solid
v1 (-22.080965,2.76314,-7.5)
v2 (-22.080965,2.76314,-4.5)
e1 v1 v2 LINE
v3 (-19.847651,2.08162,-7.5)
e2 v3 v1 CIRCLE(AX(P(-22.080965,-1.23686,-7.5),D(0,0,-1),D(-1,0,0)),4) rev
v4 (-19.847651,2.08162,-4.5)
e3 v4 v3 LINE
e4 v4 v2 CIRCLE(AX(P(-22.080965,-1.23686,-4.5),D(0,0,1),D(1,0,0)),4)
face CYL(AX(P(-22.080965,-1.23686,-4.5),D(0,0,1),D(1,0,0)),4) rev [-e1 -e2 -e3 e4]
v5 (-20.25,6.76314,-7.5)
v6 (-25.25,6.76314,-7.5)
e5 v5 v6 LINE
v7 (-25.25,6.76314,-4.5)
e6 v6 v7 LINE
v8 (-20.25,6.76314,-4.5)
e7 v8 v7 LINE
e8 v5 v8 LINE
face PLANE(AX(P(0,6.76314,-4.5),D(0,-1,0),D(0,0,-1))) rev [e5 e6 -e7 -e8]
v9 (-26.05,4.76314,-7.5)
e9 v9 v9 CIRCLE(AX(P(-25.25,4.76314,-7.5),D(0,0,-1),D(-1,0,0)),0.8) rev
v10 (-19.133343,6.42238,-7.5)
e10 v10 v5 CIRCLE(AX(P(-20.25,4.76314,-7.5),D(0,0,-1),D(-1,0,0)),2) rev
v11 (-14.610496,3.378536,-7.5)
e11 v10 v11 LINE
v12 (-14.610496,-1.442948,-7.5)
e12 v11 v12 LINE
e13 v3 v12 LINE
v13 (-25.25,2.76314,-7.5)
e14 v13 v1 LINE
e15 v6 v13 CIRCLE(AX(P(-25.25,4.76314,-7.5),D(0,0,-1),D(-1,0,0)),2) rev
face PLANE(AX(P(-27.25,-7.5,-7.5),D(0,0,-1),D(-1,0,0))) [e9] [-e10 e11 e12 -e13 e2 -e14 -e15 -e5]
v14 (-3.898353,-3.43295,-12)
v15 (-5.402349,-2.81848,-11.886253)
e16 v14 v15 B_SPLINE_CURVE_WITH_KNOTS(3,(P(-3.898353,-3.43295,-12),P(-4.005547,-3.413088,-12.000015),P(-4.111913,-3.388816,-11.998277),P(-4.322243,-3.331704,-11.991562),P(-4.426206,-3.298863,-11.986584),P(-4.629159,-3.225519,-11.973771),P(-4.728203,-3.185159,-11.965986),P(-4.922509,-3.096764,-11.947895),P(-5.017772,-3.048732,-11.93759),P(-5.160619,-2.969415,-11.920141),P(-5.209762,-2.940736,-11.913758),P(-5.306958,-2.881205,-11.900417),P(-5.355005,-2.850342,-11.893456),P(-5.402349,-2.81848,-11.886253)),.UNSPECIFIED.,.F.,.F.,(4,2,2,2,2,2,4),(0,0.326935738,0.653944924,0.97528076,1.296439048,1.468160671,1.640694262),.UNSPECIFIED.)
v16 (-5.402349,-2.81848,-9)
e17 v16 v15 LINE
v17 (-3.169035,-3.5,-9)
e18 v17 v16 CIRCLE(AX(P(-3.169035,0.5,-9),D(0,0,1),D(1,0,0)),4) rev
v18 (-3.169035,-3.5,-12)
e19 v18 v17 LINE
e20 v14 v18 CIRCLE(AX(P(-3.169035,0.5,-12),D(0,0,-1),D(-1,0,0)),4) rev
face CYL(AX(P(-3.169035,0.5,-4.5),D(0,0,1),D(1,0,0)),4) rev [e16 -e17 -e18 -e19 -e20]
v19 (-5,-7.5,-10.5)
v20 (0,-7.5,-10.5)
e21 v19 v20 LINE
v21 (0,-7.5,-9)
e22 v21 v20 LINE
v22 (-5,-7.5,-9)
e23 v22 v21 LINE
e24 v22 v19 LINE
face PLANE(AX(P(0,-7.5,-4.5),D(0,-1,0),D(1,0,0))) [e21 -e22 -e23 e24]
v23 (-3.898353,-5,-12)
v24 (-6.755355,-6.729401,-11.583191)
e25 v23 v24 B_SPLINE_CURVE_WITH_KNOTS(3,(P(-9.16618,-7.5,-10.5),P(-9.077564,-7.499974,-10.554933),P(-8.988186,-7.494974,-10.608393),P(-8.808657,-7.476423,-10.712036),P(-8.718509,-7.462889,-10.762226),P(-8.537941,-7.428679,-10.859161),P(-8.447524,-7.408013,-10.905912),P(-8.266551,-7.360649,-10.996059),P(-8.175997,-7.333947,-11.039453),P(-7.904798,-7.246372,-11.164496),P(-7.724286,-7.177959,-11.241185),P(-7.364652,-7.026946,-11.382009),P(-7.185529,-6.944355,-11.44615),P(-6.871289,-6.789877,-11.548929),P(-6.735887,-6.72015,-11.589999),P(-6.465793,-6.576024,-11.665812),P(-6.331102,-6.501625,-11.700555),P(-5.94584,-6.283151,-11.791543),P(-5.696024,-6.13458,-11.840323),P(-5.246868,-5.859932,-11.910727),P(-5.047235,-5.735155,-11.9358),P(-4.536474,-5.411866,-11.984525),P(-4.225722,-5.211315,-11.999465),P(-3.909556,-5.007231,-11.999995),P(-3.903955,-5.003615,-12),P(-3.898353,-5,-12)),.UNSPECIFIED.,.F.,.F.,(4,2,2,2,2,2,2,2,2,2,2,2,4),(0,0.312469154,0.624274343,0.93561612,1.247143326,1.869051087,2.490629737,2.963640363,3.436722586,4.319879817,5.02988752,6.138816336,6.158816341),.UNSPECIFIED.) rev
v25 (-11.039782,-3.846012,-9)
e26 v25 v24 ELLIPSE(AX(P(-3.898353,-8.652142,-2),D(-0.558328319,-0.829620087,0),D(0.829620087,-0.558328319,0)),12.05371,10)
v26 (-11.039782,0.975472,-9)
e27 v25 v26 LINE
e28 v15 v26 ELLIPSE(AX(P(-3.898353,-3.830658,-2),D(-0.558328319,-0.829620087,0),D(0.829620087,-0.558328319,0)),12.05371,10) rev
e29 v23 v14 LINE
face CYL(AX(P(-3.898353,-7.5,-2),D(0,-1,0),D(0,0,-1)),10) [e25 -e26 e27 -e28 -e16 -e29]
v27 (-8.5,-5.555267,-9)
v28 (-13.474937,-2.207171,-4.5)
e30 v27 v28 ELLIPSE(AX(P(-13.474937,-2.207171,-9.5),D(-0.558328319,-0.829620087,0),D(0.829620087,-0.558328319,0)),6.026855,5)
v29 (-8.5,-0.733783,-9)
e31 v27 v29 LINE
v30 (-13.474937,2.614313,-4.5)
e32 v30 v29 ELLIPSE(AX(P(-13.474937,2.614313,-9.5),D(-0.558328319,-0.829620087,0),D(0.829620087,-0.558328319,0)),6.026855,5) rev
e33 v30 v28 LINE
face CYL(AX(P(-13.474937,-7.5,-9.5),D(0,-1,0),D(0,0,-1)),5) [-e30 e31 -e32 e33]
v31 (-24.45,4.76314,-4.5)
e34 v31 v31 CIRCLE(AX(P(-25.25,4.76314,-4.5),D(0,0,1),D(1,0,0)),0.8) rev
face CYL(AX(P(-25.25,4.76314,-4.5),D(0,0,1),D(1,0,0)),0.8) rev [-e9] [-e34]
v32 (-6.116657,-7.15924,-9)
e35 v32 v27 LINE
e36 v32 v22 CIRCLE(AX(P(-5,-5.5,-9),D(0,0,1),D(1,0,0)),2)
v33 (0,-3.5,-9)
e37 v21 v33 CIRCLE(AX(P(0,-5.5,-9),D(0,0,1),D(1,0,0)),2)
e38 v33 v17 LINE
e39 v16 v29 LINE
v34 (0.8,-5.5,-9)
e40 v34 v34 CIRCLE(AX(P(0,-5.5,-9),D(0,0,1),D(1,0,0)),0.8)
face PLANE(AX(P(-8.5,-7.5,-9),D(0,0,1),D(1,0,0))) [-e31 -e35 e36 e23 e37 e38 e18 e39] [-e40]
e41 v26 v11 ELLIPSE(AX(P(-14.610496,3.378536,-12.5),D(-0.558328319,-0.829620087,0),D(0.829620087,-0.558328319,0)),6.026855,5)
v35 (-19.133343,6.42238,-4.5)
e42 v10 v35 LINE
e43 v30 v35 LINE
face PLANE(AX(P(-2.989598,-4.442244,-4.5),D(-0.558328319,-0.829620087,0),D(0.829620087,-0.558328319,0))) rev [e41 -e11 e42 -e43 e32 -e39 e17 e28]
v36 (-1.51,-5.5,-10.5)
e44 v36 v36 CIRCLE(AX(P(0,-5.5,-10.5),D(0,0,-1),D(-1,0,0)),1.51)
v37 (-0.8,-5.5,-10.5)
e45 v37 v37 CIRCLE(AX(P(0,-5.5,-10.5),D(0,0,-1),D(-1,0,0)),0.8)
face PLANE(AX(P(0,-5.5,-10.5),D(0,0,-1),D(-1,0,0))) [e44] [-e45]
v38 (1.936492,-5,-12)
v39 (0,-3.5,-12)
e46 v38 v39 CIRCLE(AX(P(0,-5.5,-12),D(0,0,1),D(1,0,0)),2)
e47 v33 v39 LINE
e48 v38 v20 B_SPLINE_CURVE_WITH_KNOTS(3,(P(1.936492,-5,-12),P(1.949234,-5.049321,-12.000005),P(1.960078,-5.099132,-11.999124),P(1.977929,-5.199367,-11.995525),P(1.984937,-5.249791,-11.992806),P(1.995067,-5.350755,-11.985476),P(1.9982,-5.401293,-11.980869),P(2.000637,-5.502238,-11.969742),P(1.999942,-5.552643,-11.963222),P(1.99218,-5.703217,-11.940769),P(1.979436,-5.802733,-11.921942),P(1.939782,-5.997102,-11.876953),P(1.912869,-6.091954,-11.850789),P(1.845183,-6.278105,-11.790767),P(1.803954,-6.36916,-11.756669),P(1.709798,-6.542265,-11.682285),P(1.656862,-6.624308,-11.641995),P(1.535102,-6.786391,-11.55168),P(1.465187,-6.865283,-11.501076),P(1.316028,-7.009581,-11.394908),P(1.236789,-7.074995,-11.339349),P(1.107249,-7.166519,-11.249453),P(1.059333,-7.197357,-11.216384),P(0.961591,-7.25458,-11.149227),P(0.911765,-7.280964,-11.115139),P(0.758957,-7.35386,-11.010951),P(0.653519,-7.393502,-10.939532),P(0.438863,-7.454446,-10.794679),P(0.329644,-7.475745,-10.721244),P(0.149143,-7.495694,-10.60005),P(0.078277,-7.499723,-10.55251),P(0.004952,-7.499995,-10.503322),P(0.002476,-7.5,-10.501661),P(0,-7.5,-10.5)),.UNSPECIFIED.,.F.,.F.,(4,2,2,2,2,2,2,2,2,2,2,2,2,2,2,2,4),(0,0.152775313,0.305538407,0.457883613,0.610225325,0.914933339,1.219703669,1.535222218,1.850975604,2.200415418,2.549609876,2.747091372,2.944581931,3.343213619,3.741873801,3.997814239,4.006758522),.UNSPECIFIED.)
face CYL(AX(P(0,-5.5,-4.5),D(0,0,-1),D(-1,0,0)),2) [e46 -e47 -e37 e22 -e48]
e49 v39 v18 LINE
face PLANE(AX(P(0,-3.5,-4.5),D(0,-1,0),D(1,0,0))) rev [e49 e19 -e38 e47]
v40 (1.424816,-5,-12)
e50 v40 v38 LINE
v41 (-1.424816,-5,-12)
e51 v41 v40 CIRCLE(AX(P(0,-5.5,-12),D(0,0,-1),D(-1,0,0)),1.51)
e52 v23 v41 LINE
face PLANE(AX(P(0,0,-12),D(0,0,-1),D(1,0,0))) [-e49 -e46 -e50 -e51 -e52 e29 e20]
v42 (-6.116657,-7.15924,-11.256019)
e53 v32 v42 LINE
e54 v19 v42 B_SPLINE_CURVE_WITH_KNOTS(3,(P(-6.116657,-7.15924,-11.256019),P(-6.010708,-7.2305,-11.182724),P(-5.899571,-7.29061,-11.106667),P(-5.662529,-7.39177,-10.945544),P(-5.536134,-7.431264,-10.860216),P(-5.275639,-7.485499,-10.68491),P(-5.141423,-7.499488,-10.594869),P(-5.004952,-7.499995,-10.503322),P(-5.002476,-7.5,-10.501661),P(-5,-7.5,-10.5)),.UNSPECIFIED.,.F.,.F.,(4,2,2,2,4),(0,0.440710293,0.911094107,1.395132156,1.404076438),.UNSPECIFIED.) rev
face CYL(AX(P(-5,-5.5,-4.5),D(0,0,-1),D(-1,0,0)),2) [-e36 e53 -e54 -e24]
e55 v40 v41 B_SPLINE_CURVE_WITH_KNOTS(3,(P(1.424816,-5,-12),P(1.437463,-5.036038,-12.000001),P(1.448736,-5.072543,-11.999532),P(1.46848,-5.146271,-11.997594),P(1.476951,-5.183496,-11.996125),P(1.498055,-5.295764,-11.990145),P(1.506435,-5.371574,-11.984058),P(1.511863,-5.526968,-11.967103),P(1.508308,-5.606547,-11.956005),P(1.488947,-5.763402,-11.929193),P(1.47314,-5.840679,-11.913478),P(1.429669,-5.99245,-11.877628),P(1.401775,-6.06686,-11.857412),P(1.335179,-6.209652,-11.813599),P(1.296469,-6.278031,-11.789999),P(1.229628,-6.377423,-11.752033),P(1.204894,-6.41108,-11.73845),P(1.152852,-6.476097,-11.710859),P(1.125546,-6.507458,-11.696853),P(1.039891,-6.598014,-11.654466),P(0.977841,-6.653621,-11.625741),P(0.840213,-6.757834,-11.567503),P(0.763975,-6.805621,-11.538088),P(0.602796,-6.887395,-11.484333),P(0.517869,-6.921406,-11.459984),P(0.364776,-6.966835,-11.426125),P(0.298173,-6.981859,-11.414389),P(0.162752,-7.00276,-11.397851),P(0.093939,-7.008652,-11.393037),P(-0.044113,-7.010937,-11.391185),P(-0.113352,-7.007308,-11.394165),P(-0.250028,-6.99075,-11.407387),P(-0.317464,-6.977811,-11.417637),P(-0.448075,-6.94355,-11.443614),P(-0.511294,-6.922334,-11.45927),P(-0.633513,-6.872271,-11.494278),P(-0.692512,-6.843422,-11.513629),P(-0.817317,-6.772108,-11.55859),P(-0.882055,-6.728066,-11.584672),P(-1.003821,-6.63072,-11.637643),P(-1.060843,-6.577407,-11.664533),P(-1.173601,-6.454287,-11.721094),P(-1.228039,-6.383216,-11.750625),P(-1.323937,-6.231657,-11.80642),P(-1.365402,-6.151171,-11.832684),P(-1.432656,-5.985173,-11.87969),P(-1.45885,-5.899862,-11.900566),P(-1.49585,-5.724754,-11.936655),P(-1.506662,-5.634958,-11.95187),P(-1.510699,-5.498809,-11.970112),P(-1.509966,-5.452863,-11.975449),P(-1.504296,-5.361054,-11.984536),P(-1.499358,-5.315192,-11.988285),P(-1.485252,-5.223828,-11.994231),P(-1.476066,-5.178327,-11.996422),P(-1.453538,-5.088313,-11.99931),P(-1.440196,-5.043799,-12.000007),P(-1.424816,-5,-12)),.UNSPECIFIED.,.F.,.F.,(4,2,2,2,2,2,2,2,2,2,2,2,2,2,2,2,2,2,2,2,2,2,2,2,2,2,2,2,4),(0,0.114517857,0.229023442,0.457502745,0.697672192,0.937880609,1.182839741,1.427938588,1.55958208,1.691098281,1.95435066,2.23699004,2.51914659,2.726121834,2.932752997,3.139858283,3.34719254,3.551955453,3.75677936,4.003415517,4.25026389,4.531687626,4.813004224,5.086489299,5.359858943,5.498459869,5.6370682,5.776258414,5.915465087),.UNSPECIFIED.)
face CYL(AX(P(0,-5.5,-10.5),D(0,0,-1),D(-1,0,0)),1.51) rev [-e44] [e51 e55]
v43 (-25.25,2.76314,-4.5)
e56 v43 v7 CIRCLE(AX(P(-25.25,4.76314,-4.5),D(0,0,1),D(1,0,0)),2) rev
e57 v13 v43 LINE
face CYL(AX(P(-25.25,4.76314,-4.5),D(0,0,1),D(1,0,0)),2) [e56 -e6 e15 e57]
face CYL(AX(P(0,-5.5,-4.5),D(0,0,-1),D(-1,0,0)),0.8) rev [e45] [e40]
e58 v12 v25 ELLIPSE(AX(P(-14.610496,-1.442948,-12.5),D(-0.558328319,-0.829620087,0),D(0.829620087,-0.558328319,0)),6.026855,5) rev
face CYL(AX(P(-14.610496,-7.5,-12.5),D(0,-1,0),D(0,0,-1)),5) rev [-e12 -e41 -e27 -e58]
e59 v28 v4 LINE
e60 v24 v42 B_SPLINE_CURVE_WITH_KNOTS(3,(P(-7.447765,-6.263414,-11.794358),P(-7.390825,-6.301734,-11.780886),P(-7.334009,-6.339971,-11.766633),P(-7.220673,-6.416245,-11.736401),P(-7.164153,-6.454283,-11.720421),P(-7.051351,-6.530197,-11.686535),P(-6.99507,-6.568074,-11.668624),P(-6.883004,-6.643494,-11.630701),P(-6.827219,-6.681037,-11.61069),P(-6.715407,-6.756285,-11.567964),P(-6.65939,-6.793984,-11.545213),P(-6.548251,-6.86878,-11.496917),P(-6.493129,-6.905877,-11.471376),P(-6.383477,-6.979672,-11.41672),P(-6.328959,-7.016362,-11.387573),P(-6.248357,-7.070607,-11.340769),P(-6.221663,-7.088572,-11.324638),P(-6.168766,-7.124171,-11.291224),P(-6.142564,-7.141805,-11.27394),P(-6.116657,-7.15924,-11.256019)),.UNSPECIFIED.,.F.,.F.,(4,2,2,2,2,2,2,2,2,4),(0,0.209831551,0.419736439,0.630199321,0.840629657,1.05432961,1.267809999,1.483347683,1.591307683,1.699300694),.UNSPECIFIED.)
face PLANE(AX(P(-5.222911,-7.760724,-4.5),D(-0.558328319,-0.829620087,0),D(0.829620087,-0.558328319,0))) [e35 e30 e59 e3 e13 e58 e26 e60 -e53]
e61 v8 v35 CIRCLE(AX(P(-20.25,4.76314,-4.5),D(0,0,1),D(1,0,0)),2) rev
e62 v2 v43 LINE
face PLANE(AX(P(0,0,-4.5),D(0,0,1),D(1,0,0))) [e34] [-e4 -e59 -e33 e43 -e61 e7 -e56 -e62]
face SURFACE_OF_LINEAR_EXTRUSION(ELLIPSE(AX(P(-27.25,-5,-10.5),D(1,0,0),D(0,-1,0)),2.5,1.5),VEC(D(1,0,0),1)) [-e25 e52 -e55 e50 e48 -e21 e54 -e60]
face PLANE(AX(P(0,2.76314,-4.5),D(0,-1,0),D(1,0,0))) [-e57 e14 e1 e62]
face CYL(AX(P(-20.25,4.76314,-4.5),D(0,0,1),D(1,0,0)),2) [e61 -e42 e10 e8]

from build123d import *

# Parameters (mm, degrees)
BOSS_EXTRUDE1_START = -4.5
SKETCH1_R           = 0.8
BOSS_EXTRUDE1_DEPTH = 7.5
FILLET1_R           = 4
SKETCH4_W           = 10.5
SKETCH4_H           = 4.5
CUT_EXTRUDE2_DEPTH  = 29.619267985
SKETCH5_W           = 15
SKETCH5_H           = 4.5
CUT_EXTRUDE3_DEPTH  = 29.619267985
FILLET2_R           = 10
FILLET3_R           = 5
FILLET4_R           = 5
SKETCH7_W           = 29.25
SKETCH7_H           = 14.263139721
CUT_EXTRUDE4_DEPTH  = 7.5
CUT_EXTRUDE5_START  = -6.755354819
CUT_EXTRUDE5_DEPTH  = 8.755354819
SKETCH10_R          = 1.51
CUT_EXTRUDE6_DEPTH  = 1.5


# Read off the part's stored shape, not the designer's step: Mirror5, Cut-Extrude5
with BuildPart() as part:
    # Sketch1 → Boss-Extrude1 (new body)
    with BuildSketch(Plane.XY.offset(BOSS_EXTRUDE1_START)):
        with BuildLine():
            Line((-4.389678411, -3.5), (-19.133343362, 6.422379894))
            ThreePointArc((-19.133343362, 6.422379894), (-19.666253628, 6.676053774), (-20.25, 6.763139721))
            Line((-20.25, 6.763139721), (-25.25, 6.763139721))
            ThreePointArc((-25.25, 6.763139721), (-27.246991207, 4.872803379), (-25.468997361, 2.775165839))
            ThreePointArc((-25.468997361, 2.775165839), (-25.359663658, 2.766148514), (-25.25, 2.763139721))
            Line((-25.25, 2.763139721), (-20.860321589, 2.763139721))
            Line((-20.860321589, 2.763139721), (-6.116656638, -7.159240173))
            ThreePointArc((-6.116656638, -7.159240173), (-5.583746372, -7.412914053), (-5, -7.5))
            Line((-5, -7.5), (0, -7.5))
            ThreePointArc((0, -7.5), (1.974370247, -5.81915847), (0.630136986, -3.601862129))
            ThreePointArc((0.630136986, -3.601862129), (0.31915847, -3.525629753), (0, -3.5))
            Line((0, -3.5), (-4.389678411, -3.5))
        make_face()
        with Locations((0, -5.5)):
            Circle(SKETCH1_R, mode=Mode.SUBTRACT)
        with Locations((-25.25, 4.763139721)):
            Circle(SKETCH1_R, mode=Mode.SUBTRACT)
    extrude(amount=BOSS_EXTRUDE1_DEPTH)

    # Fillet1
    fillet1_edges = [part.edges().sort_by_distance(p)[0] for p in [
        (-4.389678411, -3.5, -0.75),
        (-20.860321589, 2.763139721, -0.75),
    ]]
    fillet(fillet1_edges, radius=FILLET1_R)

    # Sketch4 → Cut-Extrude2 (cut, symmetric)
    with BuildSketch(Plane(origin=(0, 0, 0), x_dir=(1, 0, 0), z_dir=(0, 1, 0))):
        with Locations((-3.25, 2.25)):
            Rectangle(SKETCH4_W, SKETCH4_H)
    extrude(amount=CUT_EXTRUDE2_DEPTH, both=True, mode=Mode.SUBTRACT)

    # Sketch5 → Cut-Extrude3 (cut, symmetric)
    with BuildSketch(Plane(origin=(0, 0, 0), x_dir=(1, 0, 0), z_dir=(0, 1, 0))):
        with Locations((-19.75, -0.75)):
            Rectangle(SKETCH5_W, SKETCH5_H)
    extrude(amount=CUT_EXTRUDE3_DEPTH, both=True, mode=Mode.SUBTRACT)

    # Fillet2
    # the kernel refuses this fillet: 10 mm, written as the material it takes off along each edge
    with BuildSketch(Plane(origin=(-12.25, -23.910660804, 3), x_dir=(1.537930276954748e-12, 0, -1.0), z_dir=(0, 1, 0))) as fillet2_piece_1:
        with BuildLine():
            CenterArc((10, -8.351646544), FILLET2_R, 123.367012969, 56.632987031)
            Line((0, -8.351646544), (-0.2, -8.351646544))
            Line((-0.2, -8.351646544), (-0.2, 0))
            Line((-0.2, 0), (0, 0.2))
            ThreePointArc((0, 0.2), (2.25, 0.2), (4.39, 0.167032931))
            Line((4.39, 0.167032931), (4.5, 0))
        make_face()
    extrude(amount=46.579716753, mode=Mode.SUBTRACT)

    # Fillet3
    # the kernel refuses this fillet: 5 mm, written as the material it takes off along each edge
    with BuildSketch(Plane(origin=(-8.5, -17.99261029, -4.5), x_dir=(0, 0, 1), z_dir=(0, 1, 0))) as fillet3_piece_1:
        with BuildLine():
            CenterArc((5, -4.974937186), FILLET3_R, 95.739170477, 84.260829523)
            Line((0, -4.974937186), (-0.1, -4.974937186))
            Line((-0.1, -4.974937186), (-0.1, 0))
            Line((-0.1, 0), (0, 0.1))
            ThreePointArc((0, 0.1), (2.25, 0.1), (4.49, 0.099498744))
            Line((4.49, 0.099498744), (4.5, 0))
        make_face()
    extrude(amount=29.696169959, mode=Mode.SUBTRACT)

    # Fillet4
    fillet4_edges = [part.edges().sort_by_distance(p)[0] for p in [
        (-12.25, -0.620802428, -1.5),
    ]]
    fillet(fillet4_edges, radius=FILLET4_R)

    # Mirror5: part across plane


with BuildPart() as part_1:
    add(part.part)
    add(part.part.mirror(Plane.XY.offset(-4.5)))

    # Sketch7 → Cut-Extrude4 (cut)
    with BuildSketch(Plane.XY.offset(3)):
        with Locations((-12.625, -0.36843014)):
            Rectangle(SKETCH7_W, SKETCH7_H)
    extrude(amount=-CUT_EXTRUDE4_DEPTH, mode=Mode.SUBTRACT)

    # Cut-Extrude5 outline → Cut-Extrude5 (cut)
    with BuildSketch(Plane(origin=(0, 0, 0), x_dir=(0, 0, -1), z_dir=(1, 0, 0)).offset(CUT_EXTRUDE5_START)):
        with BuildLine():
            add(Edge.make_bspline(
                [(10.5, -7.5), (12, -7.5), (12, -5)],
                knots=[0, 0, 0, 1.570796327, 1.570796327, 1.570796327], degree=2, weights=[1, 0.707106781, 1]))
            Line((10.5, -7.5), (12, -7.5))
            Line((12, -7.5), (12, -5))
        make_face()
    extrude(amount=CUT_EXTRUDE5_DEPTH, mode=Mode.SUBTRACT)

    # Sketch10 → Cut-Extrude6 (cut)
    with BuildSketch(Plane(origin=(0, 0, -12), x_dir=(-1, 0, 0), z_dir=(0, 0, -1))):
        with Locations((0, -5.5)):
            Circle(SKETCH10_R)
    extrude(amount=-CUT_EXTRUDE6_DEPTH, mode=Mode.SUBTRACT)


solid = part_1.part
